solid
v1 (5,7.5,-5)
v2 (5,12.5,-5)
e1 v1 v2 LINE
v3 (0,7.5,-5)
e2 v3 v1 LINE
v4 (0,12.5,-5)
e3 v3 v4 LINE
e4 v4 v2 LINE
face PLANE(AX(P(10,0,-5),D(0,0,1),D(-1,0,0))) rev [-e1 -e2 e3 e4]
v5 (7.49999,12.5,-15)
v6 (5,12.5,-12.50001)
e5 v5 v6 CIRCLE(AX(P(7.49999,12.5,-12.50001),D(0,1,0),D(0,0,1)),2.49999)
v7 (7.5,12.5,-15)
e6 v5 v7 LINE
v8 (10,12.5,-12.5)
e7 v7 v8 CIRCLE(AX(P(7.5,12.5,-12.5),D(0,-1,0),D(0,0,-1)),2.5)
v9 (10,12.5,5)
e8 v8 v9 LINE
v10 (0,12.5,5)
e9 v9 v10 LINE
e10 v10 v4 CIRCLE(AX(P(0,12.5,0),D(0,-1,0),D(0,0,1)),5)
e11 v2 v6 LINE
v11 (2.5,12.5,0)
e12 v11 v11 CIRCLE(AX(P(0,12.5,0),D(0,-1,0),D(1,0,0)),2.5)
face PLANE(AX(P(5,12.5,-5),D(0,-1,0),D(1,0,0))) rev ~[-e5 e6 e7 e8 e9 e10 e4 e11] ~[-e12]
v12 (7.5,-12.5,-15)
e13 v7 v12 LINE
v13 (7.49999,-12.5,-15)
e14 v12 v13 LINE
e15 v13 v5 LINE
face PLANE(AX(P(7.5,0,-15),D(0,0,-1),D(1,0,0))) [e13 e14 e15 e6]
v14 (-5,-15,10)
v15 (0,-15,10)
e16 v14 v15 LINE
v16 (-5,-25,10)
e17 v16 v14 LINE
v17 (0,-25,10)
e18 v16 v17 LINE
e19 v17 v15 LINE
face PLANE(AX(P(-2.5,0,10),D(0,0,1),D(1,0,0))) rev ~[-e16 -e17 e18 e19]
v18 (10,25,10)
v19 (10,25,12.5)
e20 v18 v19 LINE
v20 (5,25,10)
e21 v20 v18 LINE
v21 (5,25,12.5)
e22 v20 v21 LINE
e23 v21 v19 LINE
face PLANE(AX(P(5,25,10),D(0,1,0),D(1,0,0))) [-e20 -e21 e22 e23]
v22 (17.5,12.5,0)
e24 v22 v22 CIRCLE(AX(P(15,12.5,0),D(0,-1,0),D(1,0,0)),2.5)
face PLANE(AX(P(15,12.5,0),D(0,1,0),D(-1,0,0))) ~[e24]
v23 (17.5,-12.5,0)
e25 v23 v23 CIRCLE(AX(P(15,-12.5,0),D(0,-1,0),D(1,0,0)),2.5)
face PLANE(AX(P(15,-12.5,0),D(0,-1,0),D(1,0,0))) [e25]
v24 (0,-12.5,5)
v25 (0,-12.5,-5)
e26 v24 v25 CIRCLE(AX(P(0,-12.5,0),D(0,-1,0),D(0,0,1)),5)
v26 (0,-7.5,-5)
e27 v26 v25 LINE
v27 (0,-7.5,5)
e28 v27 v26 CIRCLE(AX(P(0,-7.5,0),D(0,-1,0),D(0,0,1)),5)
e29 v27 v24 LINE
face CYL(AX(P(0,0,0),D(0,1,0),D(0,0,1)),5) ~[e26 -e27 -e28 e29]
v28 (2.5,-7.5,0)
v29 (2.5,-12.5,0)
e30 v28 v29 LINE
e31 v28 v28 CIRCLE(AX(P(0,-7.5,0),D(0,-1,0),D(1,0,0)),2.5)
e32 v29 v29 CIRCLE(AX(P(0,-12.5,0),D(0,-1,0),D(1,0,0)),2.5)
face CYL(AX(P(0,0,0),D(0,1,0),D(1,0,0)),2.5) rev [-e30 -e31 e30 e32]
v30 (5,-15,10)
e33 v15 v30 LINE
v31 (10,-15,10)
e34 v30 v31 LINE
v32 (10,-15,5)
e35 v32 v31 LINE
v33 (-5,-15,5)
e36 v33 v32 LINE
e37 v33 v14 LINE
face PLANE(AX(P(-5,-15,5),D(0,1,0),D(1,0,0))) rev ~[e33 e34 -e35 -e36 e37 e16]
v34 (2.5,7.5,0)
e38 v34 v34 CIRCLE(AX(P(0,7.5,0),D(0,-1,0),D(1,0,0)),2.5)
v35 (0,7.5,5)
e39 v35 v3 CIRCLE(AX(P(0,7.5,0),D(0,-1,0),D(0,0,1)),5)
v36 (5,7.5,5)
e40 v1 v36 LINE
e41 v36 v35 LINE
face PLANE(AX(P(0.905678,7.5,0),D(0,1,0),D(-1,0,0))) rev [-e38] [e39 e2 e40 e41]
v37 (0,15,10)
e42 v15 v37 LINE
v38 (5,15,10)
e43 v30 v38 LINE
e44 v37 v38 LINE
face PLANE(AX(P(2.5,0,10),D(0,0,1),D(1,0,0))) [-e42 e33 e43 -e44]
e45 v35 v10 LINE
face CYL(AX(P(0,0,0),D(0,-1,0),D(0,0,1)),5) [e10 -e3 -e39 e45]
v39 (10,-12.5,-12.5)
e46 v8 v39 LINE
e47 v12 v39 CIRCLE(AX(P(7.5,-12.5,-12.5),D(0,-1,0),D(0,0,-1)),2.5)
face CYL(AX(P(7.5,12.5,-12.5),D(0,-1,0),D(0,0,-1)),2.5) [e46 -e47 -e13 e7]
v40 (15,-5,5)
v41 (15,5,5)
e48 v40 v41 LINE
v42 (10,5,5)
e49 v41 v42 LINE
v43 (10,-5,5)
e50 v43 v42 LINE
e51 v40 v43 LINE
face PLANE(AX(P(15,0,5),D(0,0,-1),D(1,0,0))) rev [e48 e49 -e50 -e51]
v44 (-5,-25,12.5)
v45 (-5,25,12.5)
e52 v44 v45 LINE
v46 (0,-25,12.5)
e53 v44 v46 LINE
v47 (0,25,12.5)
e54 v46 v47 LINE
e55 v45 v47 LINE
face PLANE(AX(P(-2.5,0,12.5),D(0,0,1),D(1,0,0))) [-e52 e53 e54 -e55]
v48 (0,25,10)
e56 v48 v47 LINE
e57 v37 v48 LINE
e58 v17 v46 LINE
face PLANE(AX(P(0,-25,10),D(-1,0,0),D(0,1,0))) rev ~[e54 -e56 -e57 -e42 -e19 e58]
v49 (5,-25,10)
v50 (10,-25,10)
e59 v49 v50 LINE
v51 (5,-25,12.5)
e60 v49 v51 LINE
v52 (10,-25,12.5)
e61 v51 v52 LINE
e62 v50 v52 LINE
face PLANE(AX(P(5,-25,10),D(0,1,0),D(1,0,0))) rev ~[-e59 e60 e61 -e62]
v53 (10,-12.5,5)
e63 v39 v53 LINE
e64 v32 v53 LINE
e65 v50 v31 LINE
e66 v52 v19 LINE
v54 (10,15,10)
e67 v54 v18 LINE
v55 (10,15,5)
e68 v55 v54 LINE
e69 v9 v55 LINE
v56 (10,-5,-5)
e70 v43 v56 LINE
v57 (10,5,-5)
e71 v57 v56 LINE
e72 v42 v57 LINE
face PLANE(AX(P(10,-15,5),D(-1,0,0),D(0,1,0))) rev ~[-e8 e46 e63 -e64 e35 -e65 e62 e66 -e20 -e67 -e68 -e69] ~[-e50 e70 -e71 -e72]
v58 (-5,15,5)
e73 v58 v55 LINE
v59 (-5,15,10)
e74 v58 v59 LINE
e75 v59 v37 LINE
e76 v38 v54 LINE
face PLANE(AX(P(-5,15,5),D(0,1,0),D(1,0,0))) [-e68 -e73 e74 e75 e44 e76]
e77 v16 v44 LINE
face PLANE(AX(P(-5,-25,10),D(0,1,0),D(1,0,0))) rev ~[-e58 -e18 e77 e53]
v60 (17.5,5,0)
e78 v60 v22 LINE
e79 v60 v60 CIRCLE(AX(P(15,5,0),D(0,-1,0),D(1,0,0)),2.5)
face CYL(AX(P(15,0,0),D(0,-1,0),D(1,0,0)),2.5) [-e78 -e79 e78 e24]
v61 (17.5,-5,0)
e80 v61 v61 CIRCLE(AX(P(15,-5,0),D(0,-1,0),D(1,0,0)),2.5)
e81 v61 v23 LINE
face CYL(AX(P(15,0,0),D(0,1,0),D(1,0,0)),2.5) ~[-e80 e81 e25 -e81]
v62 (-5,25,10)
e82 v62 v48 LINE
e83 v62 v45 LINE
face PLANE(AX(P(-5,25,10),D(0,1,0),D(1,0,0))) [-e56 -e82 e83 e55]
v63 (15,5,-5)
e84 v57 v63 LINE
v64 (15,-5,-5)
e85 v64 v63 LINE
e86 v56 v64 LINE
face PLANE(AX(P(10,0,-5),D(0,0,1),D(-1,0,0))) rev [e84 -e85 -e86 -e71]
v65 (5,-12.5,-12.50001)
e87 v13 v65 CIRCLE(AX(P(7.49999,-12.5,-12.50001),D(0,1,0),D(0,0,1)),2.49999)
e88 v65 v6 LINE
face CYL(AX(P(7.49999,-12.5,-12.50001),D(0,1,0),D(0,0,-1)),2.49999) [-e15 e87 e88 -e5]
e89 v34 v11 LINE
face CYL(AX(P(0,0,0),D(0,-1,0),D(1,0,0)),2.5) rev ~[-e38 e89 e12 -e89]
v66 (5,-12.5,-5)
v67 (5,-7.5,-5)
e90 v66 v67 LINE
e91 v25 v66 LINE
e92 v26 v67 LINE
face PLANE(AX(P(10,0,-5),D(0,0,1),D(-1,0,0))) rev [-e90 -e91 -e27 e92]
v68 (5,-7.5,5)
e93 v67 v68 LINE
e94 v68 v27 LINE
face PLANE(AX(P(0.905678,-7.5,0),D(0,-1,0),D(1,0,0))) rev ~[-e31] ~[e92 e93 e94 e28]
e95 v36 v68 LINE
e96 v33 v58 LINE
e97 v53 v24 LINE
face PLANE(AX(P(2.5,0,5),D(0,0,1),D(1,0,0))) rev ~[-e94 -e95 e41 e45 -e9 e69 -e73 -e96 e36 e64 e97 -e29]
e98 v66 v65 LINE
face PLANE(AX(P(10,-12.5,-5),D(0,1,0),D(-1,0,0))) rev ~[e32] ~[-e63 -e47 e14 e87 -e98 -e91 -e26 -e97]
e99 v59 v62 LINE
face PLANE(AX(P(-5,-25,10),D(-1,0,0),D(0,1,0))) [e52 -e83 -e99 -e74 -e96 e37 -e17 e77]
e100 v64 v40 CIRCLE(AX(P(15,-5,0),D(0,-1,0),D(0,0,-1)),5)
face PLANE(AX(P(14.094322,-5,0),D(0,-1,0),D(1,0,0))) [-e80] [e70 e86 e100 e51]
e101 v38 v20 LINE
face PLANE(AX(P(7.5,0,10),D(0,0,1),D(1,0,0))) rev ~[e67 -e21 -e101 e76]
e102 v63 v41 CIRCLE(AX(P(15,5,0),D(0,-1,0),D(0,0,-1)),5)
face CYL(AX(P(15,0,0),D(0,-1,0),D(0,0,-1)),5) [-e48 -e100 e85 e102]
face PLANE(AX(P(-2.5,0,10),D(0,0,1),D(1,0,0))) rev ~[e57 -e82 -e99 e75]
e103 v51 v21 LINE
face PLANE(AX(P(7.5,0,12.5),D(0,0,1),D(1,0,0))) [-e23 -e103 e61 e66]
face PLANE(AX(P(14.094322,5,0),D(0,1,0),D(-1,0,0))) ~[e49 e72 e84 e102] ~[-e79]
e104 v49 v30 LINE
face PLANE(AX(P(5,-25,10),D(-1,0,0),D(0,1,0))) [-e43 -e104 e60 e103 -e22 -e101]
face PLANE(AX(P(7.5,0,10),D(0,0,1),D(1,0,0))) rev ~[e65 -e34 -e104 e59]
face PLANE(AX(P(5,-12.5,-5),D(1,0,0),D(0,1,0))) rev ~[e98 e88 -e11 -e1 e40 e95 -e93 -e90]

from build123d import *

# Parameters (mm, degrees)
F0_W      = 5
F0_H      = 10
F0_R      = 2.5
F1_DEPTH  = 12.5
F2_DEPTH  = 5
F3_DEPTH  = 12.5
F4_DEPTH  = 7.5
F7_DEPTH  = 10
F8_R      = 2.5
F9_R      = 2.49999
F10_W     = 15
F10_H     = 30
F11_DEPTH = 5
F12_W     = 5
F12_H     = 50
F13_DEPTH = 2.5


# Not quite as in the source:
# - a fillet or chamfer is up to 0.001 mm smaller than in the source, because OpenCascade refuses the exact size


with BuildPart() as f1:
    # F0 (on Front) → F1 (new body)
    with BuildSketch(Plane.XZ):
        with Locations((7.5, 0)):
            Rectangle(F0_W, F0_H)
        with BuildLine():
            Line((5, 5), (0, 5))
            ThreePointArc((0, 5), (-5, 0), (0, -5))
            Line((0, -5), (5, -5))
            Line((5, -5), (5, 5))
        make_face()
        Circle(F0_R, mode=Mode.SUBTRACT)
    extrude(amount=F1_DEPTH)

    # F0 (on Front) → F2 (join)
    with BuildSketch(Plane.XZ):
        with BuildLine():
            Line((15, 5), (10, 5))
            Line((10, 5), (10, -5))
            Line((10, -5), (15, -5))
            ThreePointArc((15, -5), (20, 0), (15, 5))
        make_face()
        with Locations((15, 0)):
            Circle(F0_R, mode=Mode.SUBTRACT)
    extrude(amount=F2_DEPTH)

    # F0 (on Front) → F3 (join)
    with BuildSketch(Plane.XZ):
        with Locations((15, 0)):
            Circle(F0_R)
    extrude(amount=F3_DEPTH)

    # F0 (on Front) → F4 (cut)
    with BuildSketch(Plane.XZ):
        with BuildLine():
            Line((5, 5), (0, 5))
            ThreePointArc((0, 5), (-5, 0), (0, -5))
            Line((0, -5), (5, -5))
            Line((5, -5), (5, 5))
        make_face()
        Circle(F0_R, mode=Mode.SUBTRACT)
    extrude(amount=F4_DEPTH, mode=Mode.SUBTRACT)

    # F5: F1 across plane


with BuildPart() as f1_1:
    add(f1.part)
    add(f1.part.mirror(Plane.XZ))

    # F6 (on face) → F7 (join)
    with BuildSketch(Plane(origin=(0, 0, -5), x_dir=(1, 0, 0), z_dir=(0, 0, -1))):
        Polygon((10, 5), (10, 12.5), (5, 12.5), (5, 7.5), (5, -7.5), (5, -12.5), (10, -12.5), (10, -5), align=None)
    extrude(amount=F7_DEPTH)

    # F8
    f8_edges = [f1_1.edges().sort_by_distance(p)[0] for p in [
        (10, 0, -15),
    ]]
    fillet(f8_edges, radius=F8_R)

    # F9 (radius 2.5 in the source; OpenCascade refuses exactly that, so slightly less here)
    f9_edges = [f1_1.edges().sort_by_distance(p)[0] for p in [
        (5, 0, -15),
    ]]
    fillet(f9_edges, radius=F9_R)

    # F10 (on face) → F11 (join)
    with BuildSketch(Plane.XY.offset(5)):
        with Locations((2.5, 0)):
            Rectangle(F10_W, F10_H)
    extrude(amount=F11_DEPTH)

    # F12 (on face) → F13 (join)
    with BuildSketch(Plane.XY.offset(10)):
        with Locations((-2.5, 0)):
            Rectangle(F12_W, F12_H)
        with Locations((7.5, 0)):
            Rectangle(F12_W, F12_H)
    extrude(amount=F13_DEPTH)


solid = f1_1.part
